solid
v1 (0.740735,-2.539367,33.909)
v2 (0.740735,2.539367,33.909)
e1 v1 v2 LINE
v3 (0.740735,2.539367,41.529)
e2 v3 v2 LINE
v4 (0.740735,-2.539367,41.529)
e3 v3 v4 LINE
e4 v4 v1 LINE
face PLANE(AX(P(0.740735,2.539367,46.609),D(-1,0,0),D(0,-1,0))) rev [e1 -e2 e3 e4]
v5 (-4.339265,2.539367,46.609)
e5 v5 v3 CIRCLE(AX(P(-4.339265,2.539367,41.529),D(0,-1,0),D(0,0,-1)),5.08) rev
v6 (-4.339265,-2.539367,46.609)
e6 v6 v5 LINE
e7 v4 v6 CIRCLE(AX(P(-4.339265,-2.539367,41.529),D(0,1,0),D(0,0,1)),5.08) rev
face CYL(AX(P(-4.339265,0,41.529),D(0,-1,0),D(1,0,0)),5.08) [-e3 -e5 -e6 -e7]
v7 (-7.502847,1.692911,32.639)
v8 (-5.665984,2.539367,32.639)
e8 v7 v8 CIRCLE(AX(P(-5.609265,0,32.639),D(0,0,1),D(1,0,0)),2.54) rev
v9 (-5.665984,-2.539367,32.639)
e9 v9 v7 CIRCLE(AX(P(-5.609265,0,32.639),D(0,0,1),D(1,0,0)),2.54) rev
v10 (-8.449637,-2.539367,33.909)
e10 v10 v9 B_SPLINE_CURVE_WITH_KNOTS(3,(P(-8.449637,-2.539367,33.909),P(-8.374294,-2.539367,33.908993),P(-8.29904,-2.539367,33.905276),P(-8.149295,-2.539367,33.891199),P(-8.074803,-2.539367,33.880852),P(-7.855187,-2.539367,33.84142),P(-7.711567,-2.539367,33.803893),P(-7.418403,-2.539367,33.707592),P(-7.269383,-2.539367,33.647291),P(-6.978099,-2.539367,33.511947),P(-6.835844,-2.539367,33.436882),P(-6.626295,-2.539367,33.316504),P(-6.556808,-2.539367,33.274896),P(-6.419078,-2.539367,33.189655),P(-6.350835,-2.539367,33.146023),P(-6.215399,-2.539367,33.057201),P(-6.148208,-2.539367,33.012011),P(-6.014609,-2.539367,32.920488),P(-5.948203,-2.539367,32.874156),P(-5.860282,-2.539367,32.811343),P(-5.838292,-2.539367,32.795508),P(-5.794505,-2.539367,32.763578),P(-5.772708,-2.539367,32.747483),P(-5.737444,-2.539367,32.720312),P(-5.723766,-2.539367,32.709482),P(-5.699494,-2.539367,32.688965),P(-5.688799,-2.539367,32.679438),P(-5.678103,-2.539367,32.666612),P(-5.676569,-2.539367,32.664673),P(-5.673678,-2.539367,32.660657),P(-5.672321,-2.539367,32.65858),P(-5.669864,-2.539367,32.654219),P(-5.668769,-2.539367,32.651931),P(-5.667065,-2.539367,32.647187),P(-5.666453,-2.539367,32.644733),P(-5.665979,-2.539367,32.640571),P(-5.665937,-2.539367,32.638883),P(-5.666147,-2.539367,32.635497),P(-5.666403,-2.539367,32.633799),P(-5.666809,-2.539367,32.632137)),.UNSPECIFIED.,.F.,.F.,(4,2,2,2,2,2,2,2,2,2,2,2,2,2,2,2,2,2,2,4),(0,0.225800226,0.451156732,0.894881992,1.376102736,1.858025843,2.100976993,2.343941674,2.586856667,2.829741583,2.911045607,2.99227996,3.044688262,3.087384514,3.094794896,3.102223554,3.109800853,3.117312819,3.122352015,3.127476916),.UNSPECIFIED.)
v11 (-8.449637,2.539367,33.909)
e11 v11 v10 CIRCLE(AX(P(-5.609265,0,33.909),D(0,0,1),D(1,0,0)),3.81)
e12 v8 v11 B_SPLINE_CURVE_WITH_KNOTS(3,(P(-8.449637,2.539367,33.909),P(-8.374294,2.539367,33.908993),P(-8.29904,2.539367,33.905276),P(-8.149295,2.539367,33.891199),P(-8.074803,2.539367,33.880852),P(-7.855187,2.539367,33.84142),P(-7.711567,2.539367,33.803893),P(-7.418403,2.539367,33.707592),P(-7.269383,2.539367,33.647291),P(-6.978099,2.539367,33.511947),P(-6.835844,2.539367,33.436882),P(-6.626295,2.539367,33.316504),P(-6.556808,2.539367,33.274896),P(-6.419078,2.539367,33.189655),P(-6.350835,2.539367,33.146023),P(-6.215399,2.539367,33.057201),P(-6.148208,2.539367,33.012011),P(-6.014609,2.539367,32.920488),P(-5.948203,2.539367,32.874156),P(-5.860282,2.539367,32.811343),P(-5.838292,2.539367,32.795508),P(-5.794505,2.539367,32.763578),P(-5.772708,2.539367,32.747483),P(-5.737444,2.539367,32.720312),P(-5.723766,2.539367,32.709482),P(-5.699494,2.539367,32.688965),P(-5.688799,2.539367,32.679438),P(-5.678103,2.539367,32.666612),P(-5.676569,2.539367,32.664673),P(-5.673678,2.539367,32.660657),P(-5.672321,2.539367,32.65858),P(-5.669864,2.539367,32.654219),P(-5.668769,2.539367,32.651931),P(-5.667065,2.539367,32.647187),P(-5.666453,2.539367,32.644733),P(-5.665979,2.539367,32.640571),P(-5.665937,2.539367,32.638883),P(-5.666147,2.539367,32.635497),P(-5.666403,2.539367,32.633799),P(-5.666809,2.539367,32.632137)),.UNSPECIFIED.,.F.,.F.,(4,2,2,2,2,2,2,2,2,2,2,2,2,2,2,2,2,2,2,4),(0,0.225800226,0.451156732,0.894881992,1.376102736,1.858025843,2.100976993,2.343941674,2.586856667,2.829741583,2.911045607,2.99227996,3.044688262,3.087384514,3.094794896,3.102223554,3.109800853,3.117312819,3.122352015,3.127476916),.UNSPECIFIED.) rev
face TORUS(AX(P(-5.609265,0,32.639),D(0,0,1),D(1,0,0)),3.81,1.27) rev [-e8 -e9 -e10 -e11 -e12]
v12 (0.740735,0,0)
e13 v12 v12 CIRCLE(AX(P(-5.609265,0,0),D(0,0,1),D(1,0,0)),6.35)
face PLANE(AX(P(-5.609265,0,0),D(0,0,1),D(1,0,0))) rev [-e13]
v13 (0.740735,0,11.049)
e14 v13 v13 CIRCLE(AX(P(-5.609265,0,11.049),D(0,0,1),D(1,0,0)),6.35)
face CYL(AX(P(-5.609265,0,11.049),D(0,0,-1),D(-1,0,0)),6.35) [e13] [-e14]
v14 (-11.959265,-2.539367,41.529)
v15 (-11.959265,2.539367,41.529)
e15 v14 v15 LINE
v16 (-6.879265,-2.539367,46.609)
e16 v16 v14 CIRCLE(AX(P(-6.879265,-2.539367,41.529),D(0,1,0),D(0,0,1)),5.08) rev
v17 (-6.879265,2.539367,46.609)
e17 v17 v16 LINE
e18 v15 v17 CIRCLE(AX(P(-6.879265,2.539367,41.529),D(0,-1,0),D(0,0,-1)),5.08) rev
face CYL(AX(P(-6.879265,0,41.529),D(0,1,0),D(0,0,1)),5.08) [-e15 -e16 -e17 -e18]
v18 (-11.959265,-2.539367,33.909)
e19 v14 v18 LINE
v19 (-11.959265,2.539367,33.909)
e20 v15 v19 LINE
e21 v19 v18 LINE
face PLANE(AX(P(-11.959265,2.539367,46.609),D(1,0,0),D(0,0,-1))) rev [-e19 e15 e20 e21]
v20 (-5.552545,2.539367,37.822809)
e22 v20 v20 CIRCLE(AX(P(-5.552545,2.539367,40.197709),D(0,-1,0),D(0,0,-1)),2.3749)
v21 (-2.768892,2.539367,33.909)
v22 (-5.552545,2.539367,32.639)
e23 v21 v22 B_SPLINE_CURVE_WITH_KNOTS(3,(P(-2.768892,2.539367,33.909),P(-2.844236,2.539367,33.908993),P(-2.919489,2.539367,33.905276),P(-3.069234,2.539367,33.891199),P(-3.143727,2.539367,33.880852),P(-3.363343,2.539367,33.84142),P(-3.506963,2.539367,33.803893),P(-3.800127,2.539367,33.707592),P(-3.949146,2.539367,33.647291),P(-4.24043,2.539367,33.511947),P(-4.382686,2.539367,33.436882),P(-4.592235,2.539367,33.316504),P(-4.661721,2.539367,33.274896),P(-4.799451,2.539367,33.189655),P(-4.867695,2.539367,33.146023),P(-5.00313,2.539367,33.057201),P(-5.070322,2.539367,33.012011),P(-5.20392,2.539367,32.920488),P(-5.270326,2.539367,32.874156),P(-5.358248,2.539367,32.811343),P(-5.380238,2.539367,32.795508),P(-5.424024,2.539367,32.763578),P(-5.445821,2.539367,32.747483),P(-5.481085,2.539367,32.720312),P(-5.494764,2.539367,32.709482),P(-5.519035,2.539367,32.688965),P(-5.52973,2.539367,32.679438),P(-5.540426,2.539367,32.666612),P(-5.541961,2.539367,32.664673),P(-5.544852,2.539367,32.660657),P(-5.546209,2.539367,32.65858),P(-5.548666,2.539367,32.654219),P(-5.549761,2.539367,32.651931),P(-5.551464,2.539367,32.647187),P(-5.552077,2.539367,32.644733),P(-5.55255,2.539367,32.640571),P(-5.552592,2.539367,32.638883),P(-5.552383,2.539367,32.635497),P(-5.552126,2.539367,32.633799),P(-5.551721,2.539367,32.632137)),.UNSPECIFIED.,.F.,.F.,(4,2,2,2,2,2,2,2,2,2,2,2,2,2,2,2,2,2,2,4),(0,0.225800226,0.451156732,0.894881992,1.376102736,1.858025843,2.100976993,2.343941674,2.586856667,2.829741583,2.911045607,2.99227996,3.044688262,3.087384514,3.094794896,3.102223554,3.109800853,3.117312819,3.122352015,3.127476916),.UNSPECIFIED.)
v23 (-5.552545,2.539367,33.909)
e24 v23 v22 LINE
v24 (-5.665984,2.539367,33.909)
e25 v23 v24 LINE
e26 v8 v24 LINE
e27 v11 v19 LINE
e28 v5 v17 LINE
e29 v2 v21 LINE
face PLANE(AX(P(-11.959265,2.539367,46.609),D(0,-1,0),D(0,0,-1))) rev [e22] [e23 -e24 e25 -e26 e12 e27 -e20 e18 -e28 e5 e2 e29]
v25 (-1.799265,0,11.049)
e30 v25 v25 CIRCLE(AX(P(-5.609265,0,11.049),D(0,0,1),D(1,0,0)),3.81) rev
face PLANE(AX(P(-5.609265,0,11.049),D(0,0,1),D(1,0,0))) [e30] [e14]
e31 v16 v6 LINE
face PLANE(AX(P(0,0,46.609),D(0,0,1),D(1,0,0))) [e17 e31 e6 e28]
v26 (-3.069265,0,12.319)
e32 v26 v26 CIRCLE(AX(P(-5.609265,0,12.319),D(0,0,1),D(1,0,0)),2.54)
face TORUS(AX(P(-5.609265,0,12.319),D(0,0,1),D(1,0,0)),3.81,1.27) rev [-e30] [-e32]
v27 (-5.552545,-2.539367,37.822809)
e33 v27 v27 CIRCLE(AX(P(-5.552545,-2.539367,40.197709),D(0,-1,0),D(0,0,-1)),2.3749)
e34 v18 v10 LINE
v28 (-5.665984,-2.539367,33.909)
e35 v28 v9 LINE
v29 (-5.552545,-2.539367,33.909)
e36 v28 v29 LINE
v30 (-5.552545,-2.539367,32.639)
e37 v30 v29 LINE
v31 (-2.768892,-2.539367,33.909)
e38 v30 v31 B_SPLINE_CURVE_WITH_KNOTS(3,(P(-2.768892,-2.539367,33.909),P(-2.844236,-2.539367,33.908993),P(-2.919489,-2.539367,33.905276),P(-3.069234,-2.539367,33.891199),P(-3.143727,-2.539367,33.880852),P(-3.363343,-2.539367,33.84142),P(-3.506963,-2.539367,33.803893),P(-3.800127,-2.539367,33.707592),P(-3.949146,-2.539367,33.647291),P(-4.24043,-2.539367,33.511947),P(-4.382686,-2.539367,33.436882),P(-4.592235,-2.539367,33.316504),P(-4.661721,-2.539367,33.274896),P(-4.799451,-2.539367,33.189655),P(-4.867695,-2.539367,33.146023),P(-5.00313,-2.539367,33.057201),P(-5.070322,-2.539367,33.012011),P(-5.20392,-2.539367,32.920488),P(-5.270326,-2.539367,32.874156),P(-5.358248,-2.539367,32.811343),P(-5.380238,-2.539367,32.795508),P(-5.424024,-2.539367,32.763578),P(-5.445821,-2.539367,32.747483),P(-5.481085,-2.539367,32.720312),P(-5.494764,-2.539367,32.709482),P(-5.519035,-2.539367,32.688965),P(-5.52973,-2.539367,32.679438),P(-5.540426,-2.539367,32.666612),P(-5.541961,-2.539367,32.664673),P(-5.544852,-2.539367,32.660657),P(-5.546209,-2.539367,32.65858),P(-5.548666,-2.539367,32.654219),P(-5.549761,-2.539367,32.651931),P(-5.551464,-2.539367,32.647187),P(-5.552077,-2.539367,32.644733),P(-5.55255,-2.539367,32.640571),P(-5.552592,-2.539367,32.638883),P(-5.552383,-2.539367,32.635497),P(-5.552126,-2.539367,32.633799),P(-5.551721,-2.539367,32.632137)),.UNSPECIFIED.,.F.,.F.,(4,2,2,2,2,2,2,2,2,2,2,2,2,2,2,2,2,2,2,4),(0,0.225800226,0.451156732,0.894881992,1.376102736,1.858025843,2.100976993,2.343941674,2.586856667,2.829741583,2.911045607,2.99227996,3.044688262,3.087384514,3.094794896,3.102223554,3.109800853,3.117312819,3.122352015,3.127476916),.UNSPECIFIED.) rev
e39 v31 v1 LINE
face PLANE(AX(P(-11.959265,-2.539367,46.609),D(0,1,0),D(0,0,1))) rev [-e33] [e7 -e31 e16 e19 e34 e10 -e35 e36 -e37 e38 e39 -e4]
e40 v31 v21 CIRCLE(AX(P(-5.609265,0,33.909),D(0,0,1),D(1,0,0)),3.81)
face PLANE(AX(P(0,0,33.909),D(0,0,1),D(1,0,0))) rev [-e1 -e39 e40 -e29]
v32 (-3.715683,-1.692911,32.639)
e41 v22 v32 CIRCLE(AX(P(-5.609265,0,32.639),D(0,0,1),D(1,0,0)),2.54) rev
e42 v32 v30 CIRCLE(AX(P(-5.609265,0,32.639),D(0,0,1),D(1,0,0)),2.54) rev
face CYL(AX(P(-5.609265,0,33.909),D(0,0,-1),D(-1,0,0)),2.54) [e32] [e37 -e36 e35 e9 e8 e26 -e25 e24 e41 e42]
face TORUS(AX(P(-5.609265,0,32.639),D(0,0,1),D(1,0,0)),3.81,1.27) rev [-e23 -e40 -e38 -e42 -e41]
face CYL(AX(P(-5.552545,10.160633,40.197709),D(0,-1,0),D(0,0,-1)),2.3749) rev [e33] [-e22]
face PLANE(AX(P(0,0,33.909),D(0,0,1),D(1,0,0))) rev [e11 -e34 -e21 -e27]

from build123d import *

# Parameters (mm, degrees)
SKETCH1_R           = 6.35
BOSS_EXTRUDE1_DEPTH = 11.049
SKETCH2_R           = 2.54
BOSS_EXTRUDE2_DEPTH = 22.86
SKETCH3_W           = 12.7
SKETCH3_H           = 5.078733264
BOSS_EXTRUDE3_DEPTH = 12.7
SKETCH4_R           = 2.3749
CUT_EXTRUDE1_DEPTH  = 12.7
FILLET2_R           = 5.08
FILLET3_R           = 5.08
FILLET5_R           = 1.27


with BuildPart() as part:
    # Sketch1 → Boss-Extrude1 (new body)
    with BuildSketch(Plane.XY):
        with Locations((-5.609264719, 0)):
            Circle(SKETCH1_R)
    extrude(amount=BOSS_EXTRUDE1_DEPTH)

    # Sketch2 → Boss-Extrude2 (add)
    with BuildSketch(Plane.XY.offset(11.049)):
        with Locations((-5.609264719, 0)):
            Circle(SKETCH2_R)
    extrude(amount=BOSS_EXTRUDE2_DEPTH)

    # Sketch3 → Boss-Extrude3 (add)
    with BuildSketch(Plane.XY.offset(33.909)):
        with Locations((-5.609264719, 0)):
            Rectangle(SKETCH3_W, SKETCH3_H)
    extrude(amount=BOSS_EXTRUDE3_DEPTH)

    # Sketch4 → Cut-Extrude1 (cut)
    with BuildSketch(Plane.XZ.offset(2.539366632)):
        with Locations(Location((-5.552545155, 40.197708747, 0), (0, 0, 270))):
            Circle(SKETCH4_R)
    extrude(amount=-CUT_EXTRUDE1_DEPTH, mode=Mode.SUBTRACT)

    # Fillet2
    fillet2_edges = [part.edges().sort_by_distance(p)[0] for p in [
        (0.740735281, 0, 46.609),
    ]]
    fillet(fillet2_edges, radius=FILLET2_R)

    # Fillet3
    fillet3_edges = [part.edges().sort_by_distance(p)[0] for p in [
        (-11.959264719, 0, 46.609),
    ]]
    fillet(fillet3_edges, radius=FILLET3_R)

    # Fillet5
    # the kernel refuses this fillet: 1.27 mm, written as the material it adds along each edge
    with BuildSketch(Plane(origin=(-5.609264719, 0, 11.049), x_dir=(1, 0, 0), z_dir=(0, -1, 0))) as fillet5_piece_1:
        with BuildLine():
            CenterArc((2.54 + FILLET5_R, FILLET5_R), FILLET5_R, 180, 90)
            Line((2.54 + FILLET5_R, 0), (2.54, 0))
            Line((2.54, 0), (2.54, FILLET5_R))
        make_face()
    revolve(axis=Axis((-5.609264719, 0, 11.049), (0, 0, 1)))
    with BuildSketch(Plane(origin=(-5.609264719, 0, 33.909), x_dir=(-0.9418707182707275, -0.3359755200370762, 0), z_dir=(-0.3359755200370762, 0.9418707182707275, 0))) as fillet5_piece_2_section:
        with BuildLine():
            CenterArc((2.54 + FILLET5_R, -FILLET5_R), FILLET5_R, 90, 90)
            Line((2.54, -FILLET5_R), (2.54, 0))
            Line((2.54, 0), (2.54 + FILLET5_R, 0))
        make_face()
    fillet5_piece_2 = revolve(axis=Axis((-5.609264719, 0, 33.909), (0, 0, 1)), revolution_arc=160.368130272, mode=Mode.PRIVATE)
    fillet5_piece_2 = split(fillet5_piece_2, bisect_by=Plane(origin=(-7.562831834, -2.539366632, 33.60366216), z_dir=(0, 1, 0)), keep=Keep.TOP, mode=Mode.PRIVATE)
    add(fillet5_piece_2)
    with BuildSketch(Plane(origin=(-5.609264719, 0, 33.909), x_dir=(0.9423620673245245, 0.3345948805164961, 0), z_dir=(0.3345948805164961, -0.9423620673245245, 0))) as fillet5_piece_3_section:
        with BuildLine():
            CenterArc((2.54 + FILLET5_R, -FILLET5_R), FILLET5_R, 90, 90)
            Line((2.54, -FILLET5_R), (2.54, 0))
            Line((2.54, 0), (2.54 + FILLET5_R, 0))
        make_face()
    fillet5_piece_3 = revolve(axis=Axis((-5.609264719, 0, 33.909), (0, 0, 1)), revolution_arc=320.904190545, mode=Mode.PRIVATE)
    fillet5_piece_3 = split(fillet5_piece_3, bisect_by=Plane(origin=(-3.654388509, -2.539366632, 33.60372255), z_dir=(0, 1, 0)), keep=Keep.TOP, mode=Mode.PRIVATE)
    fillet5_piece_3 = split(fillet5_piece_3, bisect_by=Plane(origin=(-3.654388509, 2.539366632, 33.60372255), z_dir=(0, -1, 0)), keep=Keep.TOP, mode=Mode.PRIVATE)
    add(fillet5_piece_3)
    with BuildSketch(Plane(origin=(-5.609264719, 0, 33.909), x_dir=(1, 0, 0), z_dir=(0, -1, 0))) as fillet5_piece_4_section:
        with BuildLine():
            CenterArc((2.54 + FILLET5_R, -FILLET5_R), FILLET5_R, 90, 90)
            Line((2.54, -FILLET5_R), (2.54, 0))
            Line((2.54, 0), (2.54 + FILLET5_R, 0))
        make_face()
    fillet5_piece_4 = revolve(axis=Axis((-5.609264719, 0, 33.909), (0, 0, 1)), revolution_arc=160.368130272, mode=Mode.PRIVATE)
    fillet5_piece_4 = split(fillet5_piece_4, bisect_by=Plane(origin=(-3.407688785, 2.539366632, 33.61360523), z_dir=(0, -1, 0)), keep=Keep.TOP, mode=Mode.PRIVATE)
    add(fillet5_piece_4)


solid = part.part
